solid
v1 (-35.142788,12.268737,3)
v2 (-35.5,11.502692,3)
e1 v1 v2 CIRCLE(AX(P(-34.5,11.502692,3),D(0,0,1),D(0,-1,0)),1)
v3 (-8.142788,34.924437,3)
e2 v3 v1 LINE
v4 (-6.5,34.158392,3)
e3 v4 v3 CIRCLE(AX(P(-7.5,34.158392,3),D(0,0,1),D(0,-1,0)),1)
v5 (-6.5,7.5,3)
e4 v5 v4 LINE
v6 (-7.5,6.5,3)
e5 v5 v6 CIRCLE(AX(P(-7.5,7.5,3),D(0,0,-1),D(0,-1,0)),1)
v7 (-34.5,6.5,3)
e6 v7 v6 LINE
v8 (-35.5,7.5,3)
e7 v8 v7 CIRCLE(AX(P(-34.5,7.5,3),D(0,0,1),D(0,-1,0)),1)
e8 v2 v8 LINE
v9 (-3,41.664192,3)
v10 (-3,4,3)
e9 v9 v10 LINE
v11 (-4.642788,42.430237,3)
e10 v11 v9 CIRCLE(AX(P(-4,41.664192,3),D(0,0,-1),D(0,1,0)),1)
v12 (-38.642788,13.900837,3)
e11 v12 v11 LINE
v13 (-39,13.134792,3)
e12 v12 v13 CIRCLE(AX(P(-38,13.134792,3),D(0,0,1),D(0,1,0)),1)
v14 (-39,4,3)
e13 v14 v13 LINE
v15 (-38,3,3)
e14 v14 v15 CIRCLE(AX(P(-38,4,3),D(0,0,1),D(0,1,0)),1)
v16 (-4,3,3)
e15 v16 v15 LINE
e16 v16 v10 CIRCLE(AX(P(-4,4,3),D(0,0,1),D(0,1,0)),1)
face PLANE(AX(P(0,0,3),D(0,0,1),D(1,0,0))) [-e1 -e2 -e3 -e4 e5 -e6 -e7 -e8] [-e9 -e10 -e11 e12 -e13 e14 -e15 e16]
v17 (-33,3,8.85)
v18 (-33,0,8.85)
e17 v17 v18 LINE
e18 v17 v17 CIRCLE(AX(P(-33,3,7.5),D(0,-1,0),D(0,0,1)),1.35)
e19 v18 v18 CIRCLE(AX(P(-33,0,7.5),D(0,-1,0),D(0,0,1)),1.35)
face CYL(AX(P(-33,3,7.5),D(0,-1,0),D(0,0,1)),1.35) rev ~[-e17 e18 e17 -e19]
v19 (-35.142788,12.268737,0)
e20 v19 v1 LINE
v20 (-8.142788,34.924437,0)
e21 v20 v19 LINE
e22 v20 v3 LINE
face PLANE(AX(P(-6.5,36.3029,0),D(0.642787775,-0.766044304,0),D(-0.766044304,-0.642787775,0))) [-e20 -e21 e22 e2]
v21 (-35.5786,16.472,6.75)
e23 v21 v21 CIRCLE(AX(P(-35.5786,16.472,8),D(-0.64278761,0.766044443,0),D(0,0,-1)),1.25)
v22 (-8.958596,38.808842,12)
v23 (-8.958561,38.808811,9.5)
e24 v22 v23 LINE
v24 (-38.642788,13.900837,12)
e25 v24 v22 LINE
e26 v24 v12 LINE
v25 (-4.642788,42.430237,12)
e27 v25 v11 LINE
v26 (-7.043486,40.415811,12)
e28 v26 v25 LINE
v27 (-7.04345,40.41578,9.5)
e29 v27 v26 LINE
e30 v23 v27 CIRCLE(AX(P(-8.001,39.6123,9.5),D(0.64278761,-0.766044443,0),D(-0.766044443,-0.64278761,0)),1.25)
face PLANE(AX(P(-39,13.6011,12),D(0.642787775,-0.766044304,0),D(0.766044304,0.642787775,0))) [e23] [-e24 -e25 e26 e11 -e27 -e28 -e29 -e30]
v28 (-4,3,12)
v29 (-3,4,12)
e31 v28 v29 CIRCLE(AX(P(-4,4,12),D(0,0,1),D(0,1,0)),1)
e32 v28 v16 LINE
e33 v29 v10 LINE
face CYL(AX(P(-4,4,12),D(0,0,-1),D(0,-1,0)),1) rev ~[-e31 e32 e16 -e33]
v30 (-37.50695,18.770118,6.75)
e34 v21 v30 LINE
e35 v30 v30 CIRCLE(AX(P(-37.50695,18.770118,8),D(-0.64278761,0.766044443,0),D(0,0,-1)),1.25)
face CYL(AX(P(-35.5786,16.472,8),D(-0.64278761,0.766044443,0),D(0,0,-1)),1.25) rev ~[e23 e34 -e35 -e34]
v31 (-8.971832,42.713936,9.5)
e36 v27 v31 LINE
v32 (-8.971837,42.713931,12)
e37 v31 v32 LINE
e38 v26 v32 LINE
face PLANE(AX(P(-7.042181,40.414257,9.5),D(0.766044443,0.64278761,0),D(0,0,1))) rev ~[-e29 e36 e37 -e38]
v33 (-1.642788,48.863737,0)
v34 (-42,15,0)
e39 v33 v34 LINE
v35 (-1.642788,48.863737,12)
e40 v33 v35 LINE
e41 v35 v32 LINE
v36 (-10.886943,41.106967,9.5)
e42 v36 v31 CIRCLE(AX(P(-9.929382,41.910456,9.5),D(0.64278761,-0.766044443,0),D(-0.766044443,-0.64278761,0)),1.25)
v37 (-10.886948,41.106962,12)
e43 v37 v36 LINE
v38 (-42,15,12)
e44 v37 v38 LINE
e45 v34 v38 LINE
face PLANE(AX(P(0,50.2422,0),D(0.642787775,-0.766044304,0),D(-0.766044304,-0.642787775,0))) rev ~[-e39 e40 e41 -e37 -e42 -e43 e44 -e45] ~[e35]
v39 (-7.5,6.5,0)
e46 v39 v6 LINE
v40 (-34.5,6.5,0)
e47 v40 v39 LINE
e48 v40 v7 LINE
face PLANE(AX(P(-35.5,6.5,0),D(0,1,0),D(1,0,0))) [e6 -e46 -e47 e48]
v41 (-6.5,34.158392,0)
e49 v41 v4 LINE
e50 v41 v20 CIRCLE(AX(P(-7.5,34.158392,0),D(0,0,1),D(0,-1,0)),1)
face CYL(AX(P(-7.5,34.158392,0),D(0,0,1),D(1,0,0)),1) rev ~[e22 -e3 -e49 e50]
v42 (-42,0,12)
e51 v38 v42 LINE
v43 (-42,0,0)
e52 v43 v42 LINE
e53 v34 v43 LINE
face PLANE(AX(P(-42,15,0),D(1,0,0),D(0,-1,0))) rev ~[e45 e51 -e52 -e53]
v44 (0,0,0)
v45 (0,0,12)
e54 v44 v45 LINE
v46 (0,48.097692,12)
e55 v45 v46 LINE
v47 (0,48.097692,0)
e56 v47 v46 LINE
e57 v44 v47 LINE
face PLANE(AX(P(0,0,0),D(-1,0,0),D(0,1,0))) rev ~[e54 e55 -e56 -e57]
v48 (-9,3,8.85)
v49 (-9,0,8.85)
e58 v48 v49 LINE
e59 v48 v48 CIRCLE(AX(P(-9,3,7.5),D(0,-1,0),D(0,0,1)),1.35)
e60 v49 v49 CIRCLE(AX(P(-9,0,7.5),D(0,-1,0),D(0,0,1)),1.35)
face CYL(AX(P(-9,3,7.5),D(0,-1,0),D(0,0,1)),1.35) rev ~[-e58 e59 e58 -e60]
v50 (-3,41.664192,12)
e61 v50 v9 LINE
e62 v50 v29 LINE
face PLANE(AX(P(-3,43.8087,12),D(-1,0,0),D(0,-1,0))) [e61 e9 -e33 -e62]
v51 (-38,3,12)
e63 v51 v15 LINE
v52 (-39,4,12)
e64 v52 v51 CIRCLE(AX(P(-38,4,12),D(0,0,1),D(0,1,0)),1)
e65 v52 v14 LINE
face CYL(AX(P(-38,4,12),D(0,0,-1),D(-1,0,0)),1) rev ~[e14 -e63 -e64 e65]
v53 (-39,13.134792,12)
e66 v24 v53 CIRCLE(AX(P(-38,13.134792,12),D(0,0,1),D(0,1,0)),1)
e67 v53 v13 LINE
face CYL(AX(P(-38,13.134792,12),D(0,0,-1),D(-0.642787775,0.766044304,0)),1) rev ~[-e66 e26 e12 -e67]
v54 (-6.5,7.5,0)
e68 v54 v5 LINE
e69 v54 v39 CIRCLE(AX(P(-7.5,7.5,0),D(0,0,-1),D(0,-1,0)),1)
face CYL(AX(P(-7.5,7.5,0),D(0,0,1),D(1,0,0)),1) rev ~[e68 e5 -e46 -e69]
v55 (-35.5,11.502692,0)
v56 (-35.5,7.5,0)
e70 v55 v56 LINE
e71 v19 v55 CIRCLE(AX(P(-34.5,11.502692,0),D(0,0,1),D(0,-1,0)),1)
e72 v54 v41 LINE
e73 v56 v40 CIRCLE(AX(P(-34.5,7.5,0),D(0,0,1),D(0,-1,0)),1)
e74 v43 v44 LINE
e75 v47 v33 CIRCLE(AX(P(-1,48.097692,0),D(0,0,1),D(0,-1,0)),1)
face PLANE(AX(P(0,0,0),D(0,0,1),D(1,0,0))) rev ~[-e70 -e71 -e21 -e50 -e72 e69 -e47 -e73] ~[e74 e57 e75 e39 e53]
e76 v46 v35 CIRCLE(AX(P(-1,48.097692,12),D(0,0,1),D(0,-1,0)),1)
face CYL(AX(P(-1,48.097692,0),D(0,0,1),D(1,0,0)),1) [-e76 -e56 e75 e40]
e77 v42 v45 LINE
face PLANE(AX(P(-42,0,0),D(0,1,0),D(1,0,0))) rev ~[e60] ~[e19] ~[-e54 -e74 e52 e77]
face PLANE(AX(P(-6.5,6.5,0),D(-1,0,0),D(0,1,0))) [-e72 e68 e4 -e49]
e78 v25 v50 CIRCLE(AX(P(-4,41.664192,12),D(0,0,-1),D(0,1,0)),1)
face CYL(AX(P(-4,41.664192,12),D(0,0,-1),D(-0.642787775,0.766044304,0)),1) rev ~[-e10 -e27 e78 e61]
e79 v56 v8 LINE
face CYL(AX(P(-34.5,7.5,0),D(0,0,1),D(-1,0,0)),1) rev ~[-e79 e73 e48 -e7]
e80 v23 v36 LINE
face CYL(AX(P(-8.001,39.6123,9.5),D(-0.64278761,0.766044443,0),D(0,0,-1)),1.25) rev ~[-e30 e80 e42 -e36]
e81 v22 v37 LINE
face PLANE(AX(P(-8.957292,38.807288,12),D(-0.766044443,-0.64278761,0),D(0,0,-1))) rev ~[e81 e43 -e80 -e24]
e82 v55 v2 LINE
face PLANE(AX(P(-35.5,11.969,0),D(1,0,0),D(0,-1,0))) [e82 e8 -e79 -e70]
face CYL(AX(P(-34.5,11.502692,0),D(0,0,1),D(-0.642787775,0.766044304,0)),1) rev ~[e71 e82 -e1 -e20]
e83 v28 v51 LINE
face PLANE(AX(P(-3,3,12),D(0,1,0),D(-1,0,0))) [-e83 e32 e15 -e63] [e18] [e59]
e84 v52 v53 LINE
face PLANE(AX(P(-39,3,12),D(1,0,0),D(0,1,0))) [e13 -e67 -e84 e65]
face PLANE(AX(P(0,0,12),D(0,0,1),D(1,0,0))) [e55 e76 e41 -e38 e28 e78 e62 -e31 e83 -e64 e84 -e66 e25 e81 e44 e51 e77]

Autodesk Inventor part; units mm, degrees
ref_plane "YZ Plane" through (0, 0, 0) normal (1, 0, 0) x (0, 1, 0)
ref_plane "XZ Plane" through (0, 0, 0) normal (0, 1, 0) x (-1, 0, 0)
ref_plane "XY Plane" through (0, 0, 0) normal (0, 0, 1) x (1, 0, 0)
sketch "Skizze1" plane through (0, 0, 0) normal (0, 0, 1) x (1, 0, 0)
  line L0 (0, 0) -> (0, 50.2422)
  line L1 (0, 50.2422) -> (-42, 15)
  line L2 (-42, 15) -> (-42, 0)
  line L3 (-42, 0) -> (0, 0)
  line L4 (-6.5, 6.5) -> (-6.5, 36.3029)
  line L5 (-6.5, 36.3029) -> (-35.5, 11.969)
  line L6 (-35.5, 11.969) -> (-35.5, 6.5)
  line L7 (-35.5, 6.5) -> (-6.5, 6.5)
  dimension "d0" = 130
  dimension "d1" = 15
  dimension "d2" = 42
  dimension "d3" = 6.5
  dimension "d4" = 6.5
  dimension "d6" = 6.5
  dimension "d7" = 6.5
extrude "Extrusion1" add sketch "Skizze1" along normal blind 12
sketch "Skizze2" plane through (0, 0, 12) normal (0, 0, 1) x (1, 0, 0)
  line L0 (-3, 43.8087) -> (-3, 3)
  line L1 (-3, 3) -> (-39, 3)
  line L2 (-39, 3) -> (-39, 13.6011)
  line L3 (-39, 13.6011) -> (-3, 43.8087)
  line L4 (-42, 0) -> (0, 0) projected
  line L5 (-42, 15) -> (-42, 0) projected
  line L6 (0, 50.2422) -> (-42, 15) projected
  line L7 (0, 0) -> (0, 50.2422) projected
  dimension "d10" = 3
  dimension "d11" = 3
  dimension "d12" = 3
  dimension "d13" = 3
extrude "Extrusion2" cut sketch "Skizze2" against normal blind 9 contours L0 L1 L2 L3
sketch "Skizze3" plane through (-39, 3, 12) normal (0, 1, 0) x (1, 0, 0)
  line L0 (39, 12) -> (39, 0) projected
  line L1 (39, 0) -> (36, 0) projected
  line L2 (36, 0) -> (36, 9) projected
  line L3 (36, 9) -> (0, 9) projected
  line L4 (0, 9) -> (0, 0) projected
  line L5 (0, 0) -> (-3, 0) projected
  line L6 (-3, 0) -> (-3, 12) projected
  line L7 (-3, 12) -> (39, 12) projected
  line L8 (36, 0) -> (0, 0) projected
  line L9 (0, 4.5) -> (36, 4.5)
  point P0 (6, 4.5)
  point P1 (30, 4.5)
  dimension "d17" = 6
  dimension "d18" = 6
hole "Bohrung1" at (-33, 3, 7.5) at (-9, 3, 7.5) direction (0, -1, 0) diameter 2.7 depth 8 tip angle 118
fillet "Rundung2" radius 1 9 edges at (-6.5, 6.5, 1.5) (-3, 3, 7.5) (0, 50.2422, 6) (-6.5, 36.3029, 1.5) (-3, 43.8087, 7.5) (-39, 13.6011, 7.5) (-35.5, 11.969, 1.5) (-35.5, 6.5, 1.5) (-39, 3, 7.5)
sketch "Skizze4" plane through (-38.6428, 13.9008, 3) normal (0.6427876, -0.7660444, 0) x (0.7660444, 0.6427876, 0)
  line L0 (50.4446, -3) -> (-4.3825, -3) projected
  line L1 (-4.3825, -3) -> (-4.3825, 9) projected
  line L2 (-4.3825, 9) -> (0, 9) projected
  line L3 (0, 0) -> (0, 9) projected
  line L4 (0, 0) -> (44.3838, 0) projected
  line L5 (44.3838, 0) -> (44.3838, 9) projected
  line L6 (0, 9) -> (44.3838, 9) projected
  line L7 (50.4446, 9) -> (50.4446, -3) projected
  line L8 (44.3838, 9) -> (50.4446, 9) projected
  point P0 (20.6668, -3)
  point P1 (4, 5)
  point P2 (40, 6.5)
  dimension "d27" = 4
  dimension "d28" = 4
  dimension "d29" = 2.5
  dimension "d30" = 40
  dimension "d31" = 4.3838
hole "Bohrung2" at (-35.5786, 16.472, 8) at (-8.001, 39.6123, 9.5) direction (-0.6427876, 0.7660444, 0) diameter 2.5 depth 8 tip angle 118
sketch "Skizze5" plane through (-38.6428, 13.9008, 3) normal (0.6427876, -0.7660444, 0) x (0.7660444, 0.6427876, 0)
  circle A0 centre (40, 6.5) radius 1.25 projected
  line L0 (41.25, 6.5) -> (41.25, 9)
  line L1 (50.8174, 9) -> (-1.8652, 9) projected
  line L2 (38.75, 9) -> (38.75, 6.5)
  point P0 (20.6668, -3)
extrude "Extrusion3" cut sketch "Skizze5" against normal blind 16.75 contours A0 L2 L1 L0
properties part number "oled_halterung_W162_rechts"
